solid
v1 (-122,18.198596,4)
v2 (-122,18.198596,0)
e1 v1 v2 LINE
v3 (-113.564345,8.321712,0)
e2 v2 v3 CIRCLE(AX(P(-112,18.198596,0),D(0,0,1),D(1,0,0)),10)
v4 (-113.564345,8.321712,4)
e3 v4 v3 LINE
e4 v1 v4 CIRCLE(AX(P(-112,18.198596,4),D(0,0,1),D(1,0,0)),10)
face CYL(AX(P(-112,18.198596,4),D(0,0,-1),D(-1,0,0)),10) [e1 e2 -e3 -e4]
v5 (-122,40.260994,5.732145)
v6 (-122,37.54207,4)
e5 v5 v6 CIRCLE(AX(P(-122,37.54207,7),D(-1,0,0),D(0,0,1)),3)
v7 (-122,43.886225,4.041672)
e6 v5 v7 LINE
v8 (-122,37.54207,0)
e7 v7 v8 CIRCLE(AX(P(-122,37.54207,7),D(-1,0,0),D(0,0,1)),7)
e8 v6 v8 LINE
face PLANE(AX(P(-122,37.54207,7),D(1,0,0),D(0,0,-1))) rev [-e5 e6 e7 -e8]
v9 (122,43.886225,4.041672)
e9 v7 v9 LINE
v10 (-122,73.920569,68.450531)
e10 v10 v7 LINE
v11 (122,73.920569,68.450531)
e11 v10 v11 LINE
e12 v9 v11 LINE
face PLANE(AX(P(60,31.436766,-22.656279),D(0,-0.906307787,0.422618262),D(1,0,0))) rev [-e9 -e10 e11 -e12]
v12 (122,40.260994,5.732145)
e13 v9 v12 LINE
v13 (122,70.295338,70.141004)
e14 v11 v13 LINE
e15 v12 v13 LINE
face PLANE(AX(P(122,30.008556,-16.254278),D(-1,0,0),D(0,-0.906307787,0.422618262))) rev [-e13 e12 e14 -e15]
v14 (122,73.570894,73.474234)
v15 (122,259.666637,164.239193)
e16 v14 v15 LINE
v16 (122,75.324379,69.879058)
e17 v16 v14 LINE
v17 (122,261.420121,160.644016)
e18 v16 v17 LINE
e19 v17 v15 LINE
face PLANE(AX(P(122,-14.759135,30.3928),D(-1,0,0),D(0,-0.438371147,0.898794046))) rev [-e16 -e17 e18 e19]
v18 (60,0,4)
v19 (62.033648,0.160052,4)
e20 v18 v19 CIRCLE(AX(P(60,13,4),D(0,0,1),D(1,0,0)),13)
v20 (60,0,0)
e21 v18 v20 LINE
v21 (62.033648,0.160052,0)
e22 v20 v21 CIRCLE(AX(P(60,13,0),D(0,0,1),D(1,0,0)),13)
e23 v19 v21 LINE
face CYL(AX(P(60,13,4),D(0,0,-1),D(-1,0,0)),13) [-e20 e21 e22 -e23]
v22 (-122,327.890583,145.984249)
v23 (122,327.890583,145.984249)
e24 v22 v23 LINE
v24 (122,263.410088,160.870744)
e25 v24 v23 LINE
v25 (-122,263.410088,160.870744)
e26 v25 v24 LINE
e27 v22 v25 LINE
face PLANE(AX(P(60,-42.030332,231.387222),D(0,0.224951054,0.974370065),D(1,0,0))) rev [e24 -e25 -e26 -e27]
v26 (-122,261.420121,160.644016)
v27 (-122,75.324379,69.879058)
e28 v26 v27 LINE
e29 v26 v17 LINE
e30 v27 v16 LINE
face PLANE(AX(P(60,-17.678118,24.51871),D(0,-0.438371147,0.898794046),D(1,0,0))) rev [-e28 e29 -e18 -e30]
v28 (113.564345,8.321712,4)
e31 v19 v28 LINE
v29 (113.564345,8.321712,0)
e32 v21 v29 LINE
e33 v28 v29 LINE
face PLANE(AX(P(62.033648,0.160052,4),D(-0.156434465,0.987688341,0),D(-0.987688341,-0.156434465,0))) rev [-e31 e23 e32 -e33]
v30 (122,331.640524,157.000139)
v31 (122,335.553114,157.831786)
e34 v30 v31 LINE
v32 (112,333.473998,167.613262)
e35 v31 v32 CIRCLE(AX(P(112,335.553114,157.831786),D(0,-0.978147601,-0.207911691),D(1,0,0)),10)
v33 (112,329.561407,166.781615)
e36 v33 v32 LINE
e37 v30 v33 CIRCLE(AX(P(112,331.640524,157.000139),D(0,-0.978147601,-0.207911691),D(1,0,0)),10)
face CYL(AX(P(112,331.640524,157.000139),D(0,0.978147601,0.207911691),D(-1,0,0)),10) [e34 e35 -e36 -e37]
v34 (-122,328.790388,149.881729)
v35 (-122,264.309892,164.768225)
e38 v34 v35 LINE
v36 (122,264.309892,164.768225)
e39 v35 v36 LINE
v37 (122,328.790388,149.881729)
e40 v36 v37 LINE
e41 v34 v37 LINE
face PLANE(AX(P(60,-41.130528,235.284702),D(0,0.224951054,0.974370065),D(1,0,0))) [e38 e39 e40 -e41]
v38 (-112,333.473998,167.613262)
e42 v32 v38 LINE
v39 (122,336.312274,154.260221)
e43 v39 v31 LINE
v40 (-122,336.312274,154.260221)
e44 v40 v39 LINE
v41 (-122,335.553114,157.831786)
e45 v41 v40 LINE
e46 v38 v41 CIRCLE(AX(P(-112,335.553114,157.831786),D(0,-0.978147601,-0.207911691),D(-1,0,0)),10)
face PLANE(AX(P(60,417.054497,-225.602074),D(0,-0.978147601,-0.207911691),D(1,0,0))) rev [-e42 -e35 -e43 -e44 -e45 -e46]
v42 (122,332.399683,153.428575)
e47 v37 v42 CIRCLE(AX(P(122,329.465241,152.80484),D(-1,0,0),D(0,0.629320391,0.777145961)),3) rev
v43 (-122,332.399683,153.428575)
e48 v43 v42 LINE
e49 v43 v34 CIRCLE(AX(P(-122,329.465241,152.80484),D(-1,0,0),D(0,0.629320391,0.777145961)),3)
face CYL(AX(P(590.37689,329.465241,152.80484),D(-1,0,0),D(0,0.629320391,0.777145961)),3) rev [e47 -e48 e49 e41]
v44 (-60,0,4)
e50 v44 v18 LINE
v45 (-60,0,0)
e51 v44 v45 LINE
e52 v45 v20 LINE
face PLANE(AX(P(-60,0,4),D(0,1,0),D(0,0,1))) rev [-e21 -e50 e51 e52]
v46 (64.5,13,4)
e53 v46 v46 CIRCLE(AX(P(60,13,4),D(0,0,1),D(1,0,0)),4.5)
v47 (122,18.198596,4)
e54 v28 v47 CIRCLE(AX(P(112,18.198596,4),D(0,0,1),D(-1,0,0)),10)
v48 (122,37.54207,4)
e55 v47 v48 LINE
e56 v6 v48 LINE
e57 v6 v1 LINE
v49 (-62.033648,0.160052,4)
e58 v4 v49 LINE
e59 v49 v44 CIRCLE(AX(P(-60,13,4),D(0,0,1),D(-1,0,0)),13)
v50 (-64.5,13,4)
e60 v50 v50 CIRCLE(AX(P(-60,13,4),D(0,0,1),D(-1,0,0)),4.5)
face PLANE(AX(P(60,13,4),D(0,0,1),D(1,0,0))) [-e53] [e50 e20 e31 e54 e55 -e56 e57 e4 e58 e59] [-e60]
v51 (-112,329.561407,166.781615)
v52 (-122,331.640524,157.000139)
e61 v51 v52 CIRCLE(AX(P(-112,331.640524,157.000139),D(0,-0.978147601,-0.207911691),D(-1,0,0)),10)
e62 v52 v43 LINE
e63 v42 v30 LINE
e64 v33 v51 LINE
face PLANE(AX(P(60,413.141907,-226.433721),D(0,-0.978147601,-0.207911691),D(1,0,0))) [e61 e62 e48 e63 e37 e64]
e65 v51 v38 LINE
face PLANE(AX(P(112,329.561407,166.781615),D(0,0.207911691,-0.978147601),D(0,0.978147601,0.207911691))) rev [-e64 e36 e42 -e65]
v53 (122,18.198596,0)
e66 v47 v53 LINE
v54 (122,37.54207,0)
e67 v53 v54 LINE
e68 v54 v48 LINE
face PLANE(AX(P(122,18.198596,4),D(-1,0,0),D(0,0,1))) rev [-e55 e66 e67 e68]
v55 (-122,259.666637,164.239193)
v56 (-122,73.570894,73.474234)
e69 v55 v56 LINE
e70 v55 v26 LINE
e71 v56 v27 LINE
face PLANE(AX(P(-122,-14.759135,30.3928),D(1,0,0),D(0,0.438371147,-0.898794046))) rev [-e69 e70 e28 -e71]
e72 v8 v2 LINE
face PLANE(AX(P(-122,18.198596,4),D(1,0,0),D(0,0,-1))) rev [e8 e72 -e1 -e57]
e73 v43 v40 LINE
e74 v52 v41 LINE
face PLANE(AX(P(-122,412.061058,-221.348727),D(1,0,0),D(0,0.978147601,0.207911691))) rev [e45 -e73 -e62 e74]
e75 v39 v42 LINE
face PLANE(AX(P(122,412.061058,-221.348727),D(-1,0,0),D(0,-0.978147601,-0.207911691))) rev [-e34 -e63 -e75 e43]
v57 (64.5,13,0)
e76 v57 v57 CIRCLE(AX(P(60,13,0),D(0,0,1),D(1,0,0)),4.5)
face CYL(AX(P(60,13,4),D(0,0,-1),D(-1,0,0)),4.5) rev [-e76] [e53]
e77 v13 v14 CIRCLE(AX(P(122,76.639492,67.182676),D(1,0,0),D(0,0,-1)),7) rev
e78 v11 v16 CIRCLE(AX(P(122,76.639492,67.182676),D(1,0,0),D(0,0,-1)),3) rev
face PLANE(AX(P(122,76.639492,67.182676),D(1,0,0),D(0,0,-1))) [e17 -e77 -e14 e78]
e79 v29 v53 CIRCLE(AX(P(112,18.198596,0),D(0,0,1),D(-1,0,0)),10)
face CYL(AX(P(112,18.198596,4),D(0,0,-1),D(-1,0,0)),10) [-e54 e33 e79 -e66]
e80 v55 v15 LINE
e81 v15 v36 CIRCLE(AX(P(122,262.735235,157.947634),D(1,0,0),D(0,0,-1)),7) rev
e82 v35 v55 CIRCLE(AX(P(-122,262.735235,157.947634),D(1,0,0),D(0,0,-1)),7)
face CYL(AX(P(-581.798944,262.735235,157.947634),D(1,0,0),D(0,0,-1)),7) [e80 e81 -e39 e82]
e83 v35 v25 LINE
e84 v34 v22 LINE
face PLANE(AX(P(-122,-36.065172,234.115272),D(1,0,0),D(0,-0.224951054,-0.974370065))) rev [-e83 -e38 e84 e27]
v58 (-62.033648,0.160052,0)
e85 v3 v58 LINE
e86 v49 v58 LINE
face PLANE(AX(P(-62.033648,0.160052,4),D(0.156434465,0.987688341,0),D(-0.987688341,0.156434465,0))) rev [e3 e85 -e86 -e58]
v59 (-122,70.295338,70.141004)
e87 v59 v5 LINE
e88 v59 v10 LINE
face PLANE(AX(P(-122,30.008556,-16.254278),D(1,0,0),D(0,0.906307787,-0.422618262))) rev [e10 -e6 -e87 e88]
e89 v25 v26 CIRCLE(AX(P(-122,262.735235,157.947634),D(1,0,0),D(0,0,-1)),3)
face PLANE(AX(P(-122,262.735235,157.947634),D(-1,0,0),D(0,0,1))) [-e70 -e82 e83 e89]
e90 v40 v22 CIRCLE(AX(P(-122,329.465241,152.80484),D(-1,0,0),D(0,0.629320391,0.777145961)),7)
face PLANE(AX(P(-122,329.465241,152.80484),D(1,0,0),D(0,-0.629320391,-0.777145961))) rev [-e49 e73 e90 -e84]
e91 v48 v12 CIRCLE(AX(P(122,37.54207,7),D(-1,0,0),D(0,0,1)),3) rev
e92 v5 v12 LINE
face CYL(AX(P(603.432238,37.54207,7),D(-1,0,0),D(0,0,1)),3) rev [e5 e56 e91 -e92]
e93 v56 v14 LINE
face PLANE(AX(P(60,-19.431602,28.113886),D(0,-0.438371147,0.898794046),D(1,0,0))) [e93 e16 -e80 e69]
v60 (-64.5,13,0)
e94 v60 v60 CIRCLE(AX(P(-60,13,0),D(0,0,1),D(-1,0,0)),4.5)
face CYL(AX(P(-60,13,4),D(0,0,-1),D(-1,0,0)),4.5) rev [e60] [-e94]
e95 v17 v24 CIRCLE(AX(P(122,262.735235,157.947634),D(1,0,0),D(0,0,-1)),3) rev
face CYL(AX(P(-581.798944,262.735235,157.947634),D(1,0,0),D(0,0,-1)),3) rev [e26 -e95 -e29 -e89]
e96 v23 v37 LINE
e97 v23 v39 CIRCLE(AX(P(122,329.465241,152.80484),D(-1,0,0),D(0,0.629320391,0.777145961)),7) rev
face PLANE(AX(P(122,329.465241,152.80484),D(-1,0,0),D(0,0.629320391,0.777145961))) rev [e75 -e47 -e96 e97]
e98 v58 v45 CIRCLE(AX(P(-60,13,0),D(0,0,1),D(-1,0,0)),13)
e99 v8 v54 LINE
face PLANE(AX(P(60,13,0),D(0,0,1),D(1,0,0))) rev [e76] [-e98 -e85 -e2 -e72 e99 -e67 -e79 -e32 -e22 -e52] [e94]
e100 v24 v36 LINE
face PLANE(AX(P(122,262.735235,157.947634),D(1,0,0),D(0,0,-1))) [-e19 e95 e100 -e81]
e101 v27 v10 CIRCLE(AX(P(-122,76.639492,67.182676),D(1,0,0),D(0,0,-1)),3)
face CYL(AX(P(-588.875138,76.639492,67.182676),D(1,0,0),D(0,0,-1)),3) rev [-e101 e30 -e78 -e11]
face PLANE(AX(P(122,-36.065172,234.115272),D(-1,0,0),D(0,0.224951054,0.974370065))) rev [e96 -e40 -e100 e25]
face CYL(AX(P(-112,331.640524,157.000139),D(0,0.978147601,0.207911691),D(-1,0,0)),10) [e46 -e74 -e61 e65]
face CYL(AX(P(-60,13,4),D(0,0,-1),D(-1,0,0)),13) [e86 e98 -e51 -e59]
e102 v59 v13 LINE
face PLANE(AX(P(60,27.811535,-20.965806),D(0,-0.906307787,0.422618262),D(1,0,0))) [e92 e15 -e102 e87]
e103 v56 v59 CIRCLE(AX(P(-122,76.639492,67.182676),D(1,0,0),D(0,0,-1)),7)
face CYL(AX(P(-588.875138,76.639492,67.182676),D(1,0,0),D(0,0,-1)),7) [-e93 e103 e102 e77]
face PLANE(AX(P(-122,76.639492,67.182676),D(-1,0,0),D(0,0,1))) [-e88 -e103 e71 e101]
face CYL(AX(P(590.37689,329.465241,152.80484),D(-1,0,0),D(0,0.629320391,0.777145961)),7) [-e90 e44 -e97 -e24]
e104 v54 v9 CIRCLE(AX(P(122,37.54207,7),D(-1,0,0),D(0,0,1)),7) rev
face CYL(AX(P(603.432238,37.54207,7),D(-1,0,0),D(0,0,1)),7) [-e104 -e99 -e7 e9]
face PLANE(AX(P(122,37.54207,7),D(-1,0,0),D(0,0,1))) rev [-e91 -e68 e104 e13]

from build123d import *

# Parameters (mm, degrees)
SKETCH1_R              = 4.5
EXTRUDE1_DEPTH         = 4
PROCESS_BENDS1_START   = -122
PROCESS_BENDS1_DEPTH   = 244
PROCESS_BENDS1_2_DEPTH = 244
PROCESS_BENDS1_START_2 = 357.035547254
PROCESS_BENDS1_3_DEPTH = 4.964452746


with BuildPart() as part:
    # Sketch1 → Extrude1 (new body)
    with BuildSketch(Plane.XY):
        with BuildLine():
            Line((-60, 0), (60, 0))
            ThreePointArc((60, 0), (61.019968244, 0.040074661), (62.033648046, 0.160051572))
            Line((62.033648046, 0.160051572), (113.56434465, 8.321712114))
            ThreePointArc((113.56434465, 8.321712114), (119.604059656, 11.704115036), (122, 18.19859552))
            Line((122, 18.19859552), (122, 405))
            ThreePointArc((122, 405), (119.071067812, 412.071067812), (112, 415))
            Line((112, 415), (-112, 415))
            ThreePointArc((-112, 415), (-119.071067812, 412.071067812), (-122, 405))
            Line((-122, 405), (-122, 18.19859552))
            ThreePointArc((-122, 18.19859552), (-119.604059656, 11.704115036), (-113.56434465, 8.321712114))
            Line((-113.56434465, 8.321712114), (-62.033648046, 0.160051572))
            ThreePointArc((-62.033648046, 0.160051572), (-61.019968244, 0.040074661), (-60, 0))
        make_face()
        with Locations((60, 13)):
            Circle(SKETCH1_R, mode=Mode.SUBTRACT)
        with Locations(Location((-60, 13, 0), (0, 0, 180))):
            Circle(SKETCH1_R, mode=Mode.SUBTRACT)
    extrude(amount=EXTRUDE1_DEPTH)

    # Process-Bends1: read off the stored shape, not the designer's step
    # Process-Bends1 outline → Process-Bends1 (cut)
    with BuildSketch(Plane.YZ.offset(PROCESS_BENDS1_START)):
        with BuildLine():
            Line((415, 4), (43.866625588, 4))
            ThreePointArc((43.866625588, 4), (41.283727655, 1.083920217), (37.542070268, 0))
            Line((37.542070268, 0), (415, 0))
            Line((415, 0), (415, 4))
        make_face()
    extrude(amount=PROCESS_BENDS1_DEPTH, mode=Mode.SUBTRACT)

    # Process-Bends1 2 outline → Process-Bends1 2 (add)
    with BuildSketch(Plane.YZ.offset(PROCESS_BENDS1_START)):
        with BuildLine():
            Line((333.473997554, 167.613261682), (329.561407151, 166.781614919))
            Line((329.561407151, 166.781614919), (332.399683469, 153.428574691))
            ThreePointArc((332.399683469, 153.428574691), (331.56796846, 150.665088271), (328.790387504, 149.881729425))
            Line((328.790387504, 149.881729425), (264.309892155, 164.768224749))
            ThreePointArc((264.309892155, 164.768224749), (261.942812278, 164.902637285), (259.666636747, 164.239192619))
            Line((259.666636747, 164.239192619), (73.570894156, 73.474234364))
            ThreePointArc((73.570894156, 73.474234364), (71.646739039, 72.08904089), (70.295337674, 70.141003872))
            Line((70.295337674, 70.141003872), (40.260993629, 5.732145215))
            ThreePointArc((40.260993629, 5.732145215), (39.153969093, 4.469825663), (37.542070268, 4))
            Line((37.542070268, 4), (43.866625588, 4))
            ThreePointArc((43.866625588, 4), (43.876459451, 4.020819967), (43.886224777, 4.041672168))
            Line((43.886224777, 4.041672168), (73.920568822, 68.450530825))
            ThreePointArc((73.920568822, 68.450530825), (74.499740836, 69.285403833), (75.324378743, 69.879058179))
            Line((75.324378743, 69.879058179), (261.420121334, 160.644016434))
            ThreePointArc((261.420121334, 160.644016434), (262.395625133, 160.928349862), (263.410087937, 160.87074449))
            Line((263.410087937, 160.87074449), (327.890583287, 145.984249165))
            ThreePointArc((327.890583287, 145.984249165), (334.371605517, 147.812086475), (336.312273872, 154.260221455))
            Line((336.312273872, 154.260221455), (333.473997554, 167.613261682))
        make_face()
    extrude(amount=PROCESS_BENDS1_2_DEPTH)

    # Process-Bends1 3 outline → Process-Bends1 3 (cut)
    with BuildSketch(Plane(origin=(0, 0, 0), x_dir=(1, 0, 0), z_dir=(0, 0.9781476007338049, 0.20791169081776298)).offset(PROCESS_BENDS1_START_2)):
        with BuildLine():
            Line((-122, -94.61736709), (-112, -94.61736709))
            ThreePointArc((-112, -94.61736709), (-119.071067812, -91.688434902), (-122, -84.61736709))
            Line((-122, -84.61736709), (-122, -94.61736709))
        make_face()
        with BuildLine():
            ThreePointArc((122, -84.61736709), (119.071067812, -91.688434902), (112, -94.61736709))
            Line((112, -94.61736709), (122, -94.61736709))
            Line((122, -94.61736709), (122, -84.61736709))
        make_face()
    extrude(amount=PROCESS_BENDS1_3_DEPTH, mode=Mode.SUBTRACT)


solid = part.part
